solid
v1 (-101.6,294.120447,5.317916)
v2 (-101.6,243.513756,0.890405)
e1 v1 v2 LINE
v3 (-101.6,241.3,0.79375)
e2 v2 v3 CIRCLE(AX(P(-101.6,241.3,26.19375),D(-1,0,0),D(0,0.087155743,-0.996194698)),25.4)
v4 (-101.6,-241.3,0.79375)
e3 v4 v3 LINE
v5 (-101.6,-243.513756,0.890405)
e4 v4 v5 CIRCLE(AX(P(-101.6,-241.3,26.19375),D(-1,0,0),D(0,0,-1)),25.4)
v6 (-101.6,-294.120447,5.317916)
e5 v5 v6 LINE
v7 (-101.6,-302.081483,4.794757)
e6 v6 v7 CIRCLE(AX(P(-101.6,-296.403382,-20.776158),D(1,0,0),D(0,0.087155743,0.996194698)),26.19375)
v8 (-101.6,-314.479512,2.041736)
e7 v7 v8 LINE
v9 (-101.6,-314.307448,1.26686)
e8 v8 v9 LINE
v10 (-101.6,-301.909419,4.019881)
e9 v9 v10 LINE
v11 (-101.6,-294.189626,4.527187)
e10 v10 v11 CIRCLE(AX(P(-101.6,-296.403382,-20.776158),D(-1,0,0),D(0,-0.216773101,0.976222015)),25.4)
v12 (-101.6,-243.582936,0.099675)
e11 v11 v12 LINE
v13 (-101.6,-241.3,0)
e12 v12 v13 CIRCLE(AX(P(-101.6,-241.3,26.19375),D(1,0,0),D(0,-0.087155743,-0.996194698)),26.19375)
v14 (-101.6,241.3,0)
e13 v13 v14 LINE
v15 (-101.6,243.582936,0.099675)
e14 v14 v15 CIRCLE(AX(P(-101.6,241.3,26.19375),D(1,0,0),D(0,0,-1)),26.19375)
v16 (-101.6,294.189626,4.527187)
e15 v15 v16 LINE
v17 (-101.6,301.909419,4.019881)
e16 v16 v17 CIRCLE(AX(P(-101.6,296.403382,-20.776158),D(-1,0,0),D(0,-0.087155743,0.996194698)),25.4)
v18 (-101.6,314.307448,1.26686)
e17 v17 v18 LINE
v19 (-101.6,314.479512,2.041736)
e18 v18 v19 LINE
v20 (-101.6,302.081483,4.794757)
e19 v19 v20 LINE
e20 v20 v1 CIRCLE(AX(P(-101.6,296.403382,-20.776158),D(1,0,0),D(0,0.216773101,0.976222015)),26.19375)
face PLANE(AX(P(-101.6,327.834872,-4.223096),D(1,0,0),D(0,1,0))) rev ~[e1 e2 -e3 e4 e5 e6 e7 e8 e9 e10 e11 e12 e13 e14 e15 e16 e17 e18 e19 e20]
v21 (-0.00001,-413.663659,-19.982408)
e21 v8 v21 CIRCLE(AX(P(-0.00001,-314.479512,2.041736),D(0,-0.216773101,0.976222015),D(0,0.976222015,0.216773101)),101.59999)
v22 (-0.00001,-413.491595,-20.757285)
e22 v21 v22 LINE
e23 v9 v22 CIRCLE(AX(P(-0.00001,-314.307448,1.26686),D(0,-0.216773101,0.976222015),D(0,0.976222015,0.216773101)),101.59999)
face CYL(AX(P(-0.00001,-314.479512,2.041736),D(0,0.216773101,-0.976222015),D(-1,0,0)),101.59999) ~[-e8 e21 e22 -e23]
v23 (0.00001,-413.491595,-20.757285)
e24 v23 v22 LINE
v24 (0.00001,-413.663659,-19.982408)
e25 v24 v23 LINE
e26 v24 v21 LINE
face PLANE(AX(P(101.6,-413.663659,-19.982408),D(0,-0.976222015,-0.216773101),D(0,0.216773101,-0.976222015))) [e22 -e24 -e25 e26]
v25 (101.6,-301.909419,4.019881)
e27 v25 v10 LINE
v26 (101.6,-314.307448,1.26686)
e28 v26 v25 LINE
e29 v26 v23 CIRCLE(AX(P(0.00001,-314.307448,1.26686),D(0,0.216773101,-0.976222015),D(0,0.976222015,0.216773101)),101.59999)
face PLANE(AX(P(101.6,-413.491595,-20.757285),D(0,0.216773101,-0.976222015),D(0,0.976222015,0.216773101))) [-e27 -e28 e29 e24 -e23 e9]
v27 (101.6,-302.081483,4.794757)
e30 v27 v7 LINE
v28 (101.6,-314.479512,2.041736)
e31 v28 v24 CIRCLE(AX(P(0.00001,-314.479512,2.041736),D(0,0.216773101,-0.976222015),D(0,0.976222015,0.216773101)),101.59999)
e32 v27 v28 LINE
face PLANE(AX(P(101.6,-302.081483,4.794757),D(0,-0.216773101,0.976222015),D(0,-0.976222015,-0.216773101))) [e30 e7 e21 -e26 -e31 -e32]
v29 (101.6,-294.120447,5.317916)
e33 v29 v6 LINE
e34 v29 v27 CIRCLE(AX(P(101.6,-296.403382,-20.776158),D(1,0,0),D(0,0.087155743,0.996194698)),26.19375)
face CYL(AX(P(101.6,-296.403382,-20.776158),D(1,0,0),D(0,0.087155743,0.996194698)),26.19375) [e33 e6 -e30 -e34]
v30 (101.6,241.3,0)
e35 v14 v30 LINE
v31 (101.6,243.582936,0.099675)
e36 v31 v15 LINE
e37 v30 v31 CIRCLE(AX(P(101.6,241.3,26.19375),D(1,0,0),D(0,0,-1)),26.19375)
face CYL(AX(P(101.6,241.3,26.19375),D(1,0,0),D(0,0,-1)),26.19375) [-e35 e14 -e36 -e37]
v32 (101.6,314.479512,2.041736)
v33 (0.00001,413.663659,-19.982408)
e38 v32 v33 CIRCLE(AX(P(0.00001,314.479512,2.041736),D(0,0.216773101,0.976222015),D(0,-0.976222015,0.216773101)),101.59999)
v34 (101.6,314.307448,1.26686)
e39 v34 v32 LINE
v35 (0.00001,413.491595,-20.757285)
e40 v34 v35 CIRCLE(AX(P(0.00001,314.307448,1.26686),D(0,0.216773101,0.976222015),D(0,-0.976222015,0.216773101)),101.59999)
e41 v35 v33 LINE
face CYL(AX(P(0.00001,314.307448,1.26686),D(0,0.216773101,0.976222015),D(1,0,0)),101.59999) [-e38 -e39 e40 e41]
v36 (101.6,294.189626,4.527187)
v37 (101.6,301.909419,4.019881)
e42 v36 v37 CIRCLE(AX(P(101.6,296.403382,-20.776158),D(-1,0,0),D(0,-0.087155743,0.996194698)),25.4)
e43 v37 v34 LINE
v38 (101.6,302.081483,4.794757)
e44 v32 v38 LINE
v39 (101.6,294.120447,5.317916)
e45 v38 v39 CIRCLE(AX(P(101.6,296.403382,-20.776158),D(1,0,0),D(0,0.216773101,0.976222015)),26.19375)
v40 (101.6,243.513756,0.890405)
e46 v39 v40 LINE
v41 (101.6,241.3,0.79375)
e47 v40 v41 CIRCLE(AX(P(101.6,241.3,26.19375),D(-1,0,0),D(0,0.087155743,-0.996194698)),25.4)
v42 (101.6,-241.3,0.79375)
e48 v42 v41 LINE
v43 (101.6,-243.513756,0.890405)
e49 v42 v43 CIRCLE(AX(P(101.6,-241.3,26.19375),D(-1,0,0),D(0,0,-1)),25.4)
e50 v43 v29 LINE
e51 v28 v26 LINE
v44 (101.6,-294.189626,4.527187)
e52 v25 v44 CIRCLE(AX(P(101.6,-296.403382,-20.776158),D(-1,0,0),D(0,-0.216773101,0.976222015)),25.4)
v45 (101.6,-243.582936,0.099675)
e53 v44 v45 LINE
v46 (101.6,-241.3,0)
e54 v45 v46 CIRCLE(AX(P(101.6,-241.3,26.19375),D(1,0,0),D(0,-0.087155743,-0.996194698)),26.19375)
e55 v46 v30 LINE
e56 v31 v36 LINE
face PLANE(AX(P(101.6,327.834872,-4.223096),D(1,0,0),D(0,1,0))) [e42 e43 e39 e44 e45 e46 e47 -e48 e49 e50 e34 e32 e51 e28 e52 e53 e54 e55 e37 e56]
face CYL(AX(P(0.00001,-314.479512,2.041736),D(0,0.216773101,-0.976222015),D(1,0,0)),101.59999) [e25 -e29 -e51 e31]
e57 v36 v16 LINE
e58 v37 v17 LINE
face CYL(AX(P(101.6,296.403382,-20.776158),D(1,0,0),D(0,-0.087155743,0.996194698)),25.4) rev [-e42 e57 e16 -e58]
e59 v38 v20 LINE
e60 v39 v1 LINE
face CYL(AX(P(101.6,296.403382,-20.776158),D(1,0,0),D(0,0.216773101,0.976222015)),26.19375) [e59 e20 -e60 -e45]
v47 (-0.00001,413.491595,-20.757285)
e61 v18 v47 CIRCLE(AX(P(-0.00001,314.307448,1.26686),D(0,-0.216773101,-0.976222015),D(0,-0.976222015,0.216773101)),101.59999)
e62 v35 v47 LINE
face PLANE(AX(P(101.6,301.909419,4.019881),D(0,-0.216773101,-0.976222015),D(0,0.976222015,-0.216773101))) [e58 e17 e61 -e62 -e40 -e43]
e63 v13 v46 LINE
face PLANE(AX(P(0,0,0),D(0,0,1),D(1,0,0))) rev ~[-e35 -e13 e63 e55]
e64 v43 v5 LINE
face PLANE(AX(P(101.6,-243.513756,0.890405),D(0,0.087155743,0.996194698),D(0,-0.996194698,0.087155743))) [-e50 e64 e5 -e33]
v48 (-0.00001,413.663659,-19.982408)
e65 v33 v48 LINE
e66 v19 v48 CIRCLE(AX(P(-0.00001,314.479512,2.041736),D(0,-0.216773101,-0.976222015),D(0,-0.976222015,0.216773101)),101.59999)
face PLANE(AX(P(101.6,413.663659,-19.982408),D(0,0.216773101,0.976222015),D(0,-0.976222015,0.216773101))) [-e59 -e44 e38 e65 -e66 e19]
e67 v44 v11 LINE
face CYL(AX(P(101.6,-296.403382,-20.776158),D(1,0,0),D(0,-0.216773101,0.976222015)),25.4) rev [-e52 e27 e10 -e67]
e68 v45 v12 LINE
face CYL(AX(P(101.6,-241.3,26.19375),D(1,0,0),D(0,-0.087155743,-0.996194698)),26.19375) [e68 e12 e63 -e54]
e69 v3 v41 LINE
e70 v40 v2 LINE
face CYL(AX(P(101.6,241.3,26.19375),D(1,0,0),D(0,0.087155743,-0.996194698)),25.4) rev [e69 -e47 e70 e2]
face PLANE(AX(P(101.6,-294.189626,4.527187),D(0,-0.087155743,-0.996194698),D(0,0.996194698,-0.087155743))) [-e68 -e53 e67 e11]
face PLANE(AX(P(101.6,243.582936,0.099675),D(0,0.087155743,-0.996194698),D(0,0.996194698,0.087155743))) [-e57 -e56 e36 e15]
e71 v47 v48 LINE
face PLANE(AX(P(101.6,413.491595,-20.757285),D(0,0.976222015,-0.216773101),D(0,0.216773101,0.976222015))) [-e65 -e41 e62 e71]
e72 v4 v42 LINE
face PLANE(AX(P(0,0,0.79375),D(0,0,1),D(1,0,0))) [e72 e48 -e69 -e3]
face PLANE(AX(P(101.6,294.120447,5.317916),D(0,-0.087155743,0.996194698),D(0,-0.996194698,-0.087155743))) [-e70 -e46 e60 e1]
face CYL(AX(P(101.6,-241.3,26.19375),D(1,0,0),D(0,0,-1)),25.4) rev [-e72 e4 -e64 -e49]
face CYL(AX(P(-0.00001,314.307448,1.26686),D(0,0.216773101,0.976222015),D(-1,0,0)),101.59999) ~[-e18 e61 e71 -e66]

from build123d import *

# Parameters (mm, degrees)
F0_W     = 203.2
F0_H     = 482.6
F1_DEPTH = 0.79375
F3_DEPTH = 203.2
F4_R     = 101.59999


# Not quite as in the source:
# - a fillet or chamfer is up to 0.001 mm smaller than in the source, because OpenCascade refuses the exact size


with BuildPart() as f1:
    # F0 (on Top) → F1 (new body)
    with BuildSketch(Plane.XY):
        Rectangle(F0_W, F0_H)
    extrude(amount=F1_DEPTH)

    # F2 (on face) → F3 (join, through all)
    with BuildSketch(Plane.YZ.offset(101.6)):
        with BuildLine():
            ThreePointArc((243.5137558658, 0.8904046685), (242.4079324391, 0.8179251718), (241.3, 0.79375))
            Line((241.3, 0.79375), (241.3, 0))
            ThreePointArc((241.3, 0), (242.4425553278, 0.0249306459), (243.5829357366, 0.0996751269))
            Line((243.5829357366, 0.0996751269), (294.1896263997, 4.5271868584))
            ThreePointArc((294.1896263997, 4.5271868584), (298.0689507117, 4.5691740706), (301.9094190229, 4.0198807111))
            Line((301.9094190229, 4.0198807111), (413.4915953519, -20.7572846976))
            Line((413.4915953519, -20.7572846976), (413.6636590006, -19.9824084731))
            Line((413.6636590006, -19.9824084731), (302.0814826716, 4.7947569356))
            ThreePointArc((302.0814826716, 4.7947569356), (298.1209997257, 5.3612157126), (294.1204465289, 5.3179164001))
            Line((294.1204465289, 5.3179164001), (243.5137558658, 0.8904046685))
        make_face()
        with BuildLine():
            Line((-241.3, 0), (-241.3, 0.79375))
            ThreePointArc((-241.3, 0.79375), (-242.4079324391, 0.8179251718), (-243.5137558658, 0.8904046685))
            Line((-243.5137558658, 0.8904046685), (-294.1204465289, 5.3179164001))
            ThreePointArc((-294.1204465289, 5.3179164001), (-298.1209997257, 5.3612157126), (-302.0814826716, 4.7947569356))
            Line((-302.0814826716, 4.7947569356), (-413.6636590006, -19.9824084731))
            Line((-413.6636590006, -19.9824084731), (-413.4915953519, -20.7572846976))
            Line((-413.4915953519, -20.7572846976), (-301.9094190229, 4.0198807111))
            ThreePointArc((-301.9094190229, 4.0198807111), (-298.0689507117, 4.5691740706), (-294.1896263997, 4.5271868584))
            Line((-294.1896263997, 4.5271868584), (-243.5829357366, 0.0996751269))
            ThreePointArc((-243.5829357366, 0.0996751269), (-242.4425553278, 0.0249306459), (-241.3, 0))
        make_face()
    extrude(amount=-F3_DEPTH)

    # F4 (radius 101.6 in the source; OpenCascade refuses exactly that, so slightly less here)
    f4_edges = [f1.edges().sort_by_distance(p)[0] for p in [
        (101.6, 413.577627, -20.369847),
        (-101.6, 413.577627, -20.369847),
        (101.6, -413.577627, -20.369847),
        (-101.6, -413.577627, -20.369847),
    ]]
    fillet(f4_edges, radius=F4_R)


solid = f1.part
